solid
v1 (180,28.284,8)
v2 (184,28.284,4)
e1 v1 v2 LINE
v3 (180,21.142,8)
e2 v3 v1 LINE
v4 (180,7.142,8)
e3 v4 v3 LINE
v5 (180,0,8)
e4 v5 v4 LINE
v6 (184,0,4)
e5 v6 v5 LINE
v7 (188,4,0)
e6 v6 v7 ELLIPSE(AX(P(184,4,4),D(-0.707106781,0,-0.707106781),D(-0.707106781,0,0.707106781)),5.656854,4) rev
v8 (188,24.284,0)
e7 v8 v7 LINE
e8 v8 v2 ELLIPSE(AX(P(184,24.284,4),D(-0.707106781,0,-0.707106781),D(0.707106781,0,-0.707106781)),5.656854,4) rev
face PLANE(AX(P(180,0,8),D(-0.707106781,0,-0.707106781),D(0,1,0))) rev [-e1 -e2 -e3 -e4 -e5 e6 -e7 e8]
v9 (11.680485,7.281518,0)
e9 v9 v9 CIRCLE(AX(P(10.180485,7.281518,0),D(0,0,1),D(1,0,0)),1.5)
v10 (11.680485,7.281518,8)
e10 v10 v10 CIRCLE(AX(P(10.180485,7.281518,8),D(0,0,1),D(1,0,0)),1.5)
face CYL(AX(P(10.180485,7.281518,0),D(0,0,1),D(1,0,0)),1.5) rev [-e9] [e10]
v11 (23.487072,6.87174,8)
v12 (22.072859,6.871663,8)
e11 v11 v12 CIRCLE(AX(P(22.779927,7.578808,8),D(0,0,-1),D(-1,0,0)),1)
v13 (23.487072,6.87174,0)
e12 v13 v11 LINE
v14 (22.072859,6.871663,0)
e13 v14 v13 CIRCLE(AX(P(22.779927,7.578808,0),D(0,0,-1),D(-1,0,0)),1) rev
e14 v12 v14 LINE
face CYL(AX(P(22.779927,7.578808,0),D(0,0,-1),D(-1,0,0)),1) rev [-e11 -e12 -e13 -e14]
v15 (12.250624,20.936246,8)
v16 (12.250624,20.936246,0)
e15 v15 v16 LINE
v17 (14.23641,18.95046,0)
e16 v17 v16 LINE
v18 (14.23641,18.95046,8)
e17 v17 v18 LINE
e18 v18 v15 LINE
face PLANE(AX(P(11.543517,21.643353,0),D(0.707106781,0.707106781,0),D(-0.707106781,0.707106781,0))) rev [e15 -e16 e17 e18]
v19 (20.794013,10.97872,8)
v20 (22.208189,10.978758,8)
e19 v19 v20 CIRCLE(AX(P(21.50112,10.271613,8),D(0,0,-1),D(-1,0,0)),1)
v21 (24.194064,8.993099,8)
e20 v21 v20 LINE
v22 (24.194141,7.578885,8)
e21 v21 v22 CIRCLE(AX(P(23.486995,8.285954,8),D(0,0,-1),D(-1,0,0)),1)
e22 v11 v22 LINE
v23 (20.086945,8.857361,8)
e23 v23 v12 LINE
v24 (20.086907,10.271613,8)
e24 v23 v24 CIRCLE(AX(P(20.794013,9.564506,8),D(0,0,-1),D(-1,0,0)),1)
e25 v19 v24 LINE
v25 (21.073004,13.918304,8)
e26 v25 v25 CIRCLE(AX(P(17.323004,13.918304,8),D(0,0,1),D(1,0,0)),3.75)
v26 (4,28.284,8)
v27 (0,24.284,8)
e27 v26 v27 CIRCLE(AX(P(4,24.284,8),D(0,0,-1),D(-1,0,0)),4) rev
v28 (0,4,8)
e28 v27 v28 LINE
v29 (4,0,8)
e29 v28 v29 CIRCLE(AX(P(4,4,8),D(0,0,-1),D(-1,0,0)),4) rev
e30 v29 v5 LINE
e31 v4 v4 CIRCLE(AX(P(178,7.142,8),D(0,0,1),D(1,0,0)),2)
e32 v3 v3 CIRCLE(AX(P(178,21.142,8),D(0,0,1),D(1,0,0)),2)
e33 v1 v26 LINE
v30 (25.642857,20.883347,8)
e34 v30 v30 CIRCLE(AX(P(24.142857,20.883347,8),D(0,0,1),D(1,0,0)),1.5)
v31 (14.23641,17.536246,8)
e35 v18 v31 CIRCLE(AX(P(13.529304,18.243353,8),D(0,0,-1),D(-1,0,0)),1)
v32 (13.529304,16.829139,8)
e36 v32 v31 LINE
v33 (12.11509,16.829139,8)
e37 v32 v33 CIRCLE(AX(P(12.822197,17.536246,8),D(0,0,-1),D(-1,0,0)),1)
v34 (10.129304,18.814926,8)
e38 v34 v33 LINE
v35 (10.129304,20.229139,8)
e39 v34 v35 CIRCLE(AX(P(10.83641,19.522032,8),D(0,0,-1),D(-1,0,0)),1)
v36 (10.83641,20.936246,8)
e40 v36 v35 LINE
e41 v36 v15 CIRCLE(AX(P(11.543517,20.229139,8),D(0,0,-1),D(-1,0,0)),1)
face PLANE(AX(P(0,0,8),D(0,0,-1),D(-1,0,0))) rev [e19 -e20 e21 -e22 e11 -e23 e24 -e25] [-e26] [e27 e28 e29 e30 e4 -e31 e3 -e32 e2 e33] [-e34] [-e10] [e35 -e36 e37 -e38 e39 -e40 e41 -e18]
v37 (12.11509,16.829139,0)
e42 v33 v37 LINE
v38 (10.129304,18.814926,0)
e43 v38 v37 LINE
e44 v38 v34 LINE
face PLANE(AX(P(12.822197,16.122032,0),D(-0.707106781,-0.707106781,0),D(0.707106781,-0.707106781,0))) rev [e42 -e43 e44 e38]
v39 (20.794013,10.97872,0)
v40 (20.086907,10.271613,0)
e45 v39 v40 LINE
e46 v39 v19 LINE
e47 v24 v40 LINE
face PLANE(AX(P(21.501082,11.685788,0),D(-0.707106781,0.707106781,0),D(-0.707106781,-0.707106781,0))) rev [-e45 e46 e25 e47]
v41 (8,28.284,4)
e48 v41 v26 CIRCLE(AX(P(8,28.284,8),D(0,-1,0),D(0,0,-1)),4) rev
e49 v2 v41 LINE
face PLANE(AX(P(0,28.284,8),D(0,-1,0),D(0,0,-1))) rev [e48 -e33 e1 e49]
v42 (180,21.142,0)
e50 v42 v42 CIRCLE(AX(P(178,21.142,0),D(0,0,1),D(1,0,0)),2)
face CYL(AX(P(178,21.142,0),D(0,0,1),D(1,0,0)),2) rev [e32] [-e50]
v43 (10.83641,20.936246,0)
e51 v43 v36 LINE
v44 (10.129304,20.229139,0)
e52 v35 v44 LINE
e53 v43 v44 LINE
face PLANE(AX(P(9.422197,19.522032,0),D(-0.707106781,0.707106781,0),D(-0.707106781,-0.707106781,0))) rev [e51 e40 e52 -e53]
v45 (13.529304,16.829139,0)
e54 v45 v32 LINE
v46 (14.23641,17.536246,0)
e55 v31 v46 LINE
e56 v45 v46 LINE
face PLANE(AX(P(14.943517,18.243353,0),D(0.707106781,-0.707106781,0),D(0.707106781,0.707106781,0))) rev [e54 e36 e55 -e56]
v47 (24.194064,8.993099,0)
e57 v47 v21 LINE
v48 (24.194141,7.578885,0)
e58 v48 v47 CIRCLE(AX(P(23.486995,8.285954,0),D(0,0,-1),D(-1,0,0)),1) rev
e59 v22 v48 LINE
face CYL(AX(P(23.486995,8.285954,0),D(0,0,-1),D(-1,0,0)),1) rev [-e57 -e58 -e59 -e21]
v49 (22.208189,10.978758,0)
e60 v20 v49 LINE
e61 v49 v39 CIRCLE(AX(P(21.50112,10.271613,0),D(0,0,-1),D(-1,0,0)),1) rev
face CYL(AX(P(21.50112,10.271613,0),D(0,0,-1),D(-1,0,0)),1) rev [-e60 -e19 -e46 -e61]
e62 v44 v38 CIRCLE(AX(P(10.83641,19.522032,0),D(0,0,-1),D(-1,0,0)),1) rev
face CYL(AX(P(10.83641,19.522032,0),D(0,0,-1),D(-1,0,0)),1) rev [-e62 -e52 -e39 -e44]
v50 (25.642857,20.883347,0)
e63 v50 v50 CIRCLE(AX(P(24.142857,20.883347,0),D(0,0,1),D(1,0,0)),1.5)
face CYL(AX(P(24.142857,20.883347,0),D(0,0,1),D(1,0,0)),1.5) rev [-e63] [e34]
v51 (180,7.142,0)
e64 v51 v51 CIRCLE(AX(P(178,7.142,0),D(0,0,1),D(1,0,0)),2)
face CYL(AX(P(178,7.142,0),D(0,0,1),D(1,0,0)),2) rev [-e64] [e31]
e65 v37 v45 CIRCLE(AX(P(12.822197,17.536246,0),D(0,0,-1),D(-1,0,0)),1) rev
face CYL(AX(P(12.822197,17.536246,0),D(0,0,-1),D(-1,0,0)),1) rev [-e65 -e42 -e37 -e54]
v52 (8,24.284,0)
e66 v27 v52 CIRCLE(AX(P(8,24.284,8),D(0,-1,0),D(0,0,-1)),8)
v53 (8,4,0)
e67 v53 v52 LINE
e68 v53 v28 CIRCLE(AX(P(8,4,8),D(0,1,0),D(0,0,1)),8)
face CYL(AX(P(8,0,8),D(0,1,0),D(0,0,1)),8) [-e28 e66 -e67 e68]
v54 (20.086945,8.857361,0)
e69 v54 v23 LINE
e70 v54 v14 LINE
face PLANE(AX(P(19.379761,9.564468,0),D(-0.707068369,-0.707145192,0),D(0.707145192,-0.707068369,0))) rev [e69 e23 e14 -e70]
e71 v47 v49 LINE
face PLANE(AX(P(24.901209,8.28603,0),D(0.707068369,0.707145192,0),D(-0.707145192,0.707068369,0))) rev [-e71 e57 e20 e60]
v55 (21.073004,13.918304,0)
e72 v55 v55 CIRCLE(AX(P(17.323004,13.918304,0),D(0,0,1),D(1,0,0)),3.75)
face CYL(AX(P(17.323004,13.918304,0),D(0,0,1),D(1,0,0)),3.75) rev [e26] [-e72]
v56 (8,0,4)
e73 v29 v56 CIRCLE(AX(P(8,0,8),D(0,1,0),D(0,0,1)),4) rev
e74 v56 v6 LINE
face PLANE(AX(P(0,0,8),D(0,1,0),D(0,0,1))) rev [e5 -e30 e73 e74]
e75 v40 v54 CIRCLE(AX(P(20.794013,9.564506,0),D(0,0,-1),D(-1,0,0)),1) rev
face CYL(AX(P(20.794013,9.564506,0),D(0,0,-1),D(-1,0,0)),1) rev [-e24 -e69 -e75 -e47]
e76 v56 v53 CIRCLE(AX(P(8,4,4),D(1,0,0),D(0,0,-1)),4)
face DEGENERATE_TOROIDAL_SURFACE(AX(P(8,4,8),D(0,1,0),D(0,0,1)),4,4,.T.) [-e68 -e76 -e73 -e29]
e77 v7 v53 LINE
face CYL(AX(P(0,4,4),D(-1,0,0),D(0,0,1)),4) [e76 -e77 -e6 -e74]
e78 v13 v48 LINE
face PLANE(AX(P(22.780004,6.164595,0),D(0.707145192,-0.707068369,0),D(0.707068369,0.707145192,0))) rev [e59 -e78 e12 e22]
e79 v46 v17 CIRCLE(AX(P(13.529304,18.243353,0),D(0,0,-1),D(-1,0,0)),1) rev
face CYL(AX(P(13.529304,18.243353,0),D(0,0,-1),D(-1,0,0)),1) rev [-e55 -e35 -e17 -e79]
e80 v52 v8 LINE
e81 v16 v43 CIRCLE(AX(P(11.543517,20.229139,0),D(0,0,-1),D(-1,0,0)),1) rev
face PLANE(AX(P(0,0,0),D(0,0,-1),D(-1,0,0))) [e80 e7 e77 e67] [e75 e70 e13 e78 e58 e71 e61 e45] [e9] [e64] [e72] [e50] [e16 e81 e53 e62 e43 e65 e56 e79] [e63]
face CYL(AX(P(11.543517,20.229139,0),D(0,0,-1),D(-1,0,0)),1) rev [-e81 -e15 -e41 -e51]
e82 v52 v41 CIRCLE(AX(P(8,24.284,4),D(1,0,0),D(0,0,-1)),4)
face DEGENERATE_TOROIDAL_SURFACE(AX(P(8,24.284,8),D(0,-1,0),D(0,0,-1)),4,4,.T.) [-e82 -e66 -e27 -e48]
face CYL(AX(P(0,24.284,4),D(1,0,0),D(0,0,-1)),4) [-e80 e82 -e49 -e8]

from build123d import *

# Parameters (mm, degrees)
ESQUISSE1_W             = 200
ESQUISSE1_H             = 28.284
BOSS_EXTRU_3_DEPTH      = 8
CHANFREIN1_SIZE         = 20
ESQUISSE4_R             = 2
ENL_V_MAT_EXTRU_1_DEPTH = 8
FILLET1_R               = 8
SKETCH2_R               = 1.5
SKETCH2_R_2             = 3.75
CUT_EXTRUDE1_DEPTH      = 8
FILLET9_R               = 1
FILLET10_R              = 1
FILLET4_R               = 4
FILLET5_R               = 4


# Some blends are built 0.0001 mm under size
with BuildPart() as part:
    # Esquisse1 → Boss.-Extru.3 (new body)
    with BuildSketch(Plane.XY):
        with Locations((100, 14.142)):
            Rectangle(ESQUISSE1_W, ESQUISSE1_H)
    extrude(amount=BOSS_EXTRU_3_DEPTH)

    # Chanfrein1
    # the kernel refuses this chamfer: 20 mm, written as the material it takes off along each edge
    with BuildSketch(Plane(origin=(200, -51.433659759, 8), x_dir=(0.027495876610586317, 0, -0.9996219169112968), z_dir=(0, 1, 0))) as chanfrein1_piece_1:
        Polygon((CHANFREIN1_SIZE * 0.999621916911, CHANFREIN1_SIZE * 0.0274958766106), (-CHANFREIN1_SIZE * 0.0274958766106, CHANFREIN1_SIZE * 0.999621916911), (0, 0), align=None)
    extrude(amount=131.151319519, mode=Mode.SUBTRACT)

    # Esquisse4 → Enlèv. mat.-Extru.1 (cut)
    with BuildSketch(Plane.XY.offset(8)):
        with Locations((178, 7.142)):
            Circle(ESQUISSE4_R)
        with Locations((178, 21.142)):
            Circle(ESQUISSE4_R)
    extrude(amount=-ENL_V_MAT_EXTRU_1_DEPTH, mode=Mode.SUBTRACT)

    # Fillet1
    fillet1_edges = [part.edges().sort_by_distance(p)[0] for p in [
        (0, 14.142, 0),
    ]]
    fillet(fillet1_edges, radius=FILLET1_R - 0.0001)  # a hair under: the kernel refuses the full size

    # Sketch2 → Cut-Extrude1 (cut)
    with BuildSketch(Plane.XY.offset(8)):
        with Locations((10.180485171, 7.281517741)):
            Circle(SKETCH2_R)
        with Locations((24.142857006, 20.883346587)):
            Circle(SKETCH2_R)
        with Locations((17.323003706, 13.918303783)):
            Circle(SKETCH2_R_2)
        Polygon((14.943517177, 18.243352736), (12.822196834, 16.122032392), (9.422196834, 19.522032392), (11.543517177, 21.643352736), align=None)
        Polygon((19.379761465, 9.564467761), (22.780003771, 6.164594852), (24.901208877, 8.286030428), (21.501081812, 11.685788108), align=None)
    extrude(amount=-CUT_EXTRUDE1_DEPTH, mode=Mode.SUBTRACT)

    # Fillet9
    fillet9_edges = [part.edges().sort_by_distance(p)[0] for p in [
        (9.422196834, 19.522032392, 4),
        (11.543517177, 21.643352736, 4),
        (14.943517177, 18.243352736, 4),
        (12.822196834, 16.122032392, 4),
    ]]
    fillet(fillet9_edges, radius=FILLET9_R)

    # Fillet10
    fillet10_edges = [part.edges().sort_by_distance(p)[0] for p in [
        (24.901208877, 8.286030428, 4),
        (22.780003771, 6.164594852, 4),
        (19.379761465, 9.564467761, 4),
        (21.501081812, 11.685788108, 4),
    ]]
    fillet(fillet10_edges, radius=FILLET10_R)

    # Fillet4
    fillet4_edges = [part.edges().sort_by_distance(p)[0] for p in [
        (97.99995, 0, 0),
        (2.343116461, 0, 2.343116461),
    ]]
    fillet(fillet4_edges, radius=FILLET4_R)

    # Fillet5
    fillet5_edges = [part.edges().sort_by_distance(p)[0] for p in [
        (97.99995, 28.284, 0),
        (2.343116461, 28.284, 2.343116461),
    ]]
    fillet(fillet5_edges, radius=FILLET5_R)


solid = part.part
